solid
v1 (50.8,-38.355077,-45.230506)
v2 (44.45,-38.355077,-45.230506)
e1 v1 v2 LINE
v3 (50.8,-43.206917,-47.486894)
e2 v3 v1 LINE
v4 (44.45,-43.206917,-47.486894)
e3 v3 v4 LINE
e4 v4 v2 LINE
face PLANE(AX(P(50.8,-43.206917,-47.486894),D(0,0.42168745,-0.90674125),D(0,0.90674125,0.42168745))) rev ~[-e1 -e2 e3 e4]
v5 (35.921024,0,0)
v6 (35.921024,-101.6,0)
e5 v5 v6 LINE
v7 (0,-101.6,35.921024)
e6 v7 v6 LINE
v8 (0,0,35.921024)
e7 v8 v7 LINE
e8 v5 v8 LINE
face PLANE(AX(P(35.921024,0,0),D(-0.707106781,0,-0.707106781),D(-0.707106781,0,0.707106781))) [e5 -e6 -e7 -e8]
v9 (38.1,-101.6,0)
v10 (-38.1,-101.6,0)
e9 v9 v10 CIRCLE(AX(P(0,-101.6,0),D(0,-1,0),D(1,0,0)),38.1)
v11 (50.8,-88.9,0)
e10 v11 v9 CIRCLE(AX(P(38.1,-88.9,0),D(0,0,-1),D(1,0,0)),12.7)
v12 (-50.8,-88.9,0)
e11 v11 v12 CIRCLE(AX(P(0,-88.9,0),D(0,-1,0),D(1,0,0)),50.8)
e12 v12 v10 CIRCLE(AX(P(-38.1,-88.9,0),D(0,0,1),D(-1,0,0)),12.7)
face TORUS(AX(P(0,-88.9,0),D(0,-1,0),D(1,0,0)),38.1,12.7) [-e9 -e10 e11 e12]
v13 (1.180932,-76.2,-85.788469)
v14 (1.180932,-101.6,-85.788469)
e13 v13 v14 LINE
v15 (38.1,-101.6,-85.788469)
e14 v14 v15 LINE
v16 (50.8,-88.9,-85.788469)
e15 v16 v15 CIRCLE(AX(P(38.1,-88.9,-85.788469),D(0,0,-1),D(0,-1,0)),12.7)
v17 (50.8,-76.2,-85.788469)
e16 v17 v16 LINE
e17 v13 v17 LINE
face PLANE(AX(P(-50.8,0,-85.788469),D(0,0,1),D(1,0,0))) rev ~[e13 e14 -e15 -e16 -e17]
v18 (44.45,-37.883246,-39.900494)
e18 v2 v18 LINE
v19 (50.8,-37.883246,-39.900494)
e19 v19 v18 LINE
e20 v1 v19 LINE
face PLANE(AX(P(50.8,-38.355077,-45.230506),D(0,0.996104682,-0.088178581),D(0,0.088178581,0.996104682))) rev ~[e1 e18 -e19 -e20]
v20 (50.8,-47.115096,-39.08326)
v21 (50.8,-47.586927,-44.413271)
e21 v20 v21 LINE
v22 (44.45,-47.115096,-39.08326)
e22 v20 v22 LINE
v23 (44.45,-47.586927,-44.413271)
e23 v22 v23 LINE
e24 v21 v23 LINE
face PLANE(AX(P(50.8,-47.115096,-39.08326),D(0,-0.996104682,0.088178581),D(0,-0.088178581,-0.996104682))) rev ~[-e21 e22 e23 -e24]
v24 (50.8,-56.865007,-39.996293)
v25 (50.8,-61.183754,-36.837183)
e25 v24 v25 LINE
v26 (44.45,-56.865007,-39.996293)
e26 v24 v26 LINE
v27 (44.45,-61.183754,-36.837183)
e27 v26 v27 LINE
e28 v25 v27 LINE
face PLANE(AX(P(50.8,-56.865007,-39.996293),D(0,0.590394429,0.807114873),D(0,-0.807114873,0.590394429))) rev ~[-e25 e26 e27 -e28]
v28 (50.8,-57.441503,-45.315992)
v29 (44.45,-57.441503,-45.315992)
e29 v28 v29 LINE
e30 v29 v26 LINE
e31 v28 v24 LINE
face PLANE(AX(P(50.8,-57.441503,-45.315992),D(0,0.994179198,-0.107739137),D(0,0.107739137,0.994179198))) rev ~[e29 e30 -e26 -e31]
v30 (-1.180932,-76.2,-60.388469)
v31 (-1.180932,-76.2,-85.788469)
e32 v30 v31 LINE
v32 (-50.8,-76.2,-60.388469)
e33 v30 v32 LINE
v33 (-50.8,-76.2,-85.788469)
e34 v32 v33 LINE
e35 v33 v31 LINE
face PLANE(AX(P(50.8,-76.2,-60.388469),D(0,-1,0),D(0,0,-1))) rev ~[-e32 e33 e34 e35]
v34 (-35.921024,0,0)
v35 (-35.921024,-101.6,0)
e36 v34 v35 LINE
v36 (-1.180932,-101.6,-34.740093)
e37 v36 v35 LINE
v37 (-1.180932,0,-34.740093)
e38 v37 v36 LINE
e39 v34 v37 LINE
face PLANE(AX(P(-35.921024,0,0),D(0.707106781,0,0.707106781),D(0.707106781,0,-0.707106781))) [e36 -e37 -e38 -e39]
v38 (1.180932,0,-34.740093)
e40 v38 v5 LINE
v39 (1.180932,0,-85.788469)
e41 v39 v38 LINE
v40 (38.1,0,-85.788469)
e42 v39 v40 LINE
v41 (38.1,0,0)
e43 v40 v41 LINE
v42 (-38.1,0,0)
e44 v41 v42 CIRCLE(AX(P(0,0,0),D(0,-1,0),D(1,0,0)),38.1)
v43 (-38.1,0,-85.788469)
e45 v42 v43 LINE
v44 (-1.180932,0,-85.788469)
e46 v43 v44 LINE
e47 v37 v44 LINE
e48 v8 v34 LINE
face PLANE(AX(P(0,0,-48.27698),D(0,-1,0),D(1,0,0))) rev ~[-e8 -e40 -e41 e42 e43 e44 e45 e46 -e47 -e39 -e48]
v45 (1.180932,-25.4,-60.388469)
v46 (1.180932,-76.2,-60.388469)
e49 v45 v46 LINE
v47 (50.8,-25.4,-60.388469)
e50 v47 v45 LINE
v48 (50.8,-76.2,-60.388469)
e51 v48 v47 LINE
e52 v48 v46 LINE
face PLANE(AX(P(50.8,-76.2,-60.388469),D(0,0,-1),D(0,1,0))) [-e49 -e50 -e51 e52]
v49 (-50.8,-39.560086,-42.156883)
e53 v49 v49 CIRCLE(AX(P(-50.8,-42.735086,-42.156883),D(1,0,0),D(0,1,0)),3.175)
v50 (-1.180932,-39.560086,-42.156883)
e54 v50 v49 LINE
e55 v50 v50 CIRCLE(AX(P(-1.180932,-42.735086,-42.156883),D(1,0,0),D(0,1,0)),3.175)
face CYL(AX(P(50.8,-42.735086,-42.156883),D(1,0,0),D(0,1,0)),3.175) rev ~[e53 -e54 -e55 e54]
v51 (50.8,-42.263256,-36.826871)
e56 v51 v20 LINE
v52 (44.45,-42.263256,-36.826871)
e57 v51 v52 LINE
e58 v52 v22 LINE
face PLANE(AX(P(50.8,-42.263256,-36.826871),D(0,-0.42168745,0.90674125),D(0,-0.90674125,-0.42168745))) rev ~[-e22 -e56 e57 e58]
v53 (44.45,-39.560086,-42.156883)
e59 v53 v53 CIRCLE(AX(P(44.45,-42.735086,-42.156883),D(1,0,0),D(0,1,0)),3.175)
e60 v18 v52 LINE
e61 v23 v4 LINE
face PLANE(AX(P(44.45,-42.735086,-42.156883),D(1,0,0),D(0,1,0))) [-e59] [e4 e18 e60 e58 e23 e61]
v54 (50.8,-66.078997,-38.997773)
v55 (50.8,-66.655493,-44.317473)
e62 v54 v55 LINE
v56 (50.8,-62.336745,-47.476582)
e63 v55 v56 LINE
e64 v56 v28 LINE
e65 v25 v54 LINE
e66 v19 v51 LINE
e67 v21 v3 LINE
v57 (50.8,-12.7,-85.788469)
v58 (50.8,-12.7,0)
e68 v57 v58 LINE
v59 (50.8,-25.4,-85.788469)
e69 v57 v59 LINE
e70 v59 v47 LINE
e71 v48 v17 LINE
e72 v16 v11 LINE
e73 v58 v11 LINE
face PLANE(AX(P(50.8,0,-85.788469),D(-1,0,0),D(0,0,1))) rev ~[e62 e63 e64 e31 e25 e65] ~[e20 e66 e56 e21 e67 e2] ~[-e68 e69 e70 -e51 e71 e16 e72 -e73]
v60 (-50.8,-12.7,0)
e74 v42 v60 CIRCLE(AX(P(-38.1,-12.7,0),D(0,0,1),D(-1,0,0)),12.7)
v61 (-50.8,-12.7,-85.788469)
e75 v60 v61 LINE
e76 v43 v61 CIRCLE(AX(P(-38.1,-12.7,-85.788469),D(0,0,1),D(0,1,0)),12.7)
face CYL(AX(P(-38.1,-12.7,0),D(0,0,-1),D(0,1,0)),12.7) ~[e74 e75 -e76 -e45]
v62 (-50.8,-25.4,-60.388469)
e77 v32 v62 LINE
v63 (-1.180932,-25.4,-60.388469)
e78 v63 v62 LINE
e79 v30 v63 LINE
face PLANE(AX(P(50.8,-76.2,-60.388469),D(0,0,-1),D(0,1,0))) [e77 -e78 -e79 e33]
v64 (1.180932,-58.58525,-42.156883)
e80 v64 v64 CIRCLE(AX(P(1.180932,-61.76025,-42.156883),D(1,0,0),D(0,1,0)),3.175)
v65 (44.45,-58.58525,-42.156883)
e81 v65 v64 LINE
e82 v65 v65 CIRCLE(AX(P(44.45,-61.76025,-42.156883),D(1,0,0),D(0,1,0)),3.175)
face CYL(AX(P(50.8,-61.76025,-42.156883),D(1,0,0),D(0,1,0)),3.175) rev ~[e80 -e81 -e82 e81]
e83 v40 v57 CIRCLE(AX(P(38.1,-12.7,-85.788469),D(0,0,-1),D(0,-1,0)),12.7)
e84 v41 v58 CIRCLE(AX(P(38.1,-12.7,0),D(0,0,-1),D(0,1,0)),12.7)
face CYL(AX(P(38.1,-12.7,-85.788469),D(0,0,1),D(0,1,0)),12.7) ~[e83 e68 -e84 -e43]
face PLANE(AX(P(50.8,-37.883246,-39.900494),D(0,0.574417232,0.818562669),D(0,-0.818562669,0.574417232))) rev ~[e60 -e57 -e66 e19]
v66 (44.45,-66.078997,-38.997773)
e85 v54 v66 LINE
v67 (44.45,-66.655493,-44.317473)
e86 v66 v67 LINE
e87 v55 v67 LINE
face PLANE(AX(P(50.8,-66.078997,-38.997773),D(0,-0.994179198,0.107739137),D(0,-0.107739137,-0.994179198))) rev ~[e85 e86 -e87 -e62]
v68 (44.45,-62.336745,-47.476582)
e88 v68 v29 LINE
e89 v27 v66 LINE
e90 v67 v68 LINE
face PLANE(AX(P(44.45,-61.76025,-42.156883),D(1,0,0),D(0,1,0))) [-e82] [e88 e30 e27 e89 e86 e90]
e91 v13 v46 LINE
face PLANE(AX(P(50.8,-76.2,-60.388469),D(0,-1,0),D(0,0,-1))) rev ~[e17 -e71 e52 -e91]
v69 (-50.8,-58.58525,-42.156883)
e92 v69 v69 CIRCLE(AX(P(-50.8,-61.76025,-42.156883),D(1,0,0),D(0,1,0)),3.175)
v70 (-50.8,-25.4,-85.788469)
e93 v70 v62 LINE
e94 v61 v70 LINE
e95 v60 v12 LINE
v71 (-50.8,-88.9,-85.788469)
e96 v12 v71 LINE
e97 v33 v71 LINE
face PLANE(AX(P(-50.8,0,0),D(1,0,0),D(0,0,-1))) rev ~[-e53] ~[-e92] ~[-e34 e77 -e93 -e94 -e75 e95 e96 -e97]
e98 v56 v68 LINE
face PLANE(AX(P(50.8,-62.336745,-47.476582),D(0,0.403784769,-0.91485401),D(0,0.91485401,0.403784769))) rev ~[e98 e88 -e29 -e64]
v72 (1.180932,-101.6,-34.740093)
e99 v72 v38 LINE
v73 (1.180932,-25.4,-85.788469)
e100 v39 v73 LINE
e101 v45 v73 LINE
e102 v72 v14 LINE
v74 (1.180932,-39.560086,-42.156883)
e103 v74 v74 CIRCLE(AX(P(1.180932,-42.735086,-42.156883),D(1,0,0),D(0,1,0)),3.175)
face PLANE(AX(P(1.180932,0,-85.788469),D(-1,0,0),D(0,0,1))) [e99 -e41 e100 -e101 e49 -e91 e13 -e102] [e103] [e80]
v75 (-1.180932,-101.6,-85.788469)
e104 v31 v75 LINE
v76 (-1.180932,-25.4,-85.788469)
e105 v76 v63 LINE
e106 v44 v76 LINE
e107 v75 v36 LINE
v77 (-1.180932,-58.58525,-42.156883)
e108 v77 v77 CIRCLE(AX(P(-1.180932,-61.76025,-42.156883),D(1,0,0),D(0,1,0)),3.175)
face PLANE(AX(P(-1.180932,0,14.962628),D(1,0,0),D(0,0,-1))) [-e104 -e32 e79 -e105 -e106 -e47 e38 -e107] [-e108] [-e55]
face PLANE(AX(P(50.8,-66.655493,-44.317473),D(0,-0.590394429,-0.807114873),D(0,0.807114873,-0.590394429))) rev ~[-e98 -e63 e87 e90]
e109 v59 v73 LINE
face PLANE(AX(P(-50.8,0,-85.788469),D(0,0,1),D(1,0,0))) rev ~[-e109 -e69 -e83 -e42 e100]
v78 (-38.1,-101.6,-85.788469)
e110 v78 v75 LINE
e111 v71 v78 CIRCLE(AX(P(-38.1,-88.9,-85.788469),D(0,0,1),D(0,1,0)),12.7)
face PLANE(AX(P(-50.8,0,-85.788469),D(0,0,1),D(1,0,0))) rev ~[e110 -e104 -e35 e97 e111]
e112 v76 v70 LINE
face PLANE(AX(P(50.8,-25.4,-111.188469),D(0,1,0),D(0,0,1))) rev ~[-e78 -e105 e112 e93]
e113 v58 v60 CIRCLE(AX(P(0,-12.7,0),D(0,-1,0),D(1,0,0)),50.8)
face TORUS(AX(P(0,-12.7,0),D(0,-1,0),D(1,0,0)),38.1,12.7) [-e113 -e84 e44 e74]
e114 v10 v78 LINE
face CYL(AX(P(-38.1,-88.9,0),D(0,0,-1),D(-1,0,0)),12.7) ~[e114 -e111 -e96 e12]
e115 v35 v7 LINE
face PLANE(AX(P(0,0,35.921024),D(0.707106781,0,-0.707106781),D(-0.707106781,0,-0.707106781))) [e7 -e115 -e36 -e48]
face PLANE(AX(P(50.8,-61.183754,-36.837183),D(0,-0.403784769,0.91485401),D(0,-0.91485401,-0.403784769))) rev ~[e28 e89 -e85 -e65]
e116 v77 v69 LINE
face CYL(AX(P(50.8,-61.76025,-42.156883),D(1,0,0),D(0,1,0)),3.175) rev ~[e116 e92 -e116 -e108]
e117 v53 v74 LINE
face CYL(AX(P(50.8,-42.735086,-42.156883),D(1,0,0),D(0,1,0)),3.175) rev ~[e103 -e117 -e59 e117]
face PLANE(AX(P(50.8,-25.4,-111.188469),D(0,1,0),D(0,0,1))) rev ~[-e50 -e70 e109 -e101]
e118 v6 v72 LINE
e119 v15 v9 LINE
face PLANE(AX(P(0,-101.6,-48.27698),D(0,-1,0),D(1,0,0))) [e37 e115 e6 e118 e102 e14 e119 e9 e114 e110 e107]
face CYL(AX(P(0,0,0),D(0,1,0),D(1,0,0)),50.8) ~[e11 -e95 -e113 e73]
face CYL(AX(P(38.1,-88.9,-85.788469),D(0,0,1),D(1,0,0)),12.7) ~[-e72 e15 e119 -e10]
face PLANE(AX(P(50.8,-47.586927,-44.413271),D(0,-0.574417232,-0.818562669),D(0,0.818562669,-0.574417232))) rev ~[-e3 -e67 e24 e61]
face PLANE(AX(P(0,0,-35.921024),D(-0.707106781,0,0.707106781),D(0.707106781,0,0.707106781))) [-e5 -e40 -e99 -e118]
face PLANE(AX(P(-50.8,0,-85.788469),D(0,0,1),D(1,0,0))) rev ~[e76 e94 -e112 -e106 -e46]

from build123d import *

# Parameters (mm, degrees)
F3_DEPTH = 101.6
F4_DEPTH = 282.663077116
F5_R     = 3.175
F6_DEPTH = 127
F7_DEPTH = 6.35
F8_W     = 50.8
F8_H     = 50.8
F8_H_2   = 25.4
F9_DEPTH = 127
F10_R    = 12.7


with BuildPart() as f3:
    # F0 (on Front) → F3 (new body)
    with BuildSketch(Plane.XZ):
        with BuildLine():
            Line((50.8, -85.7884685198), (50.8, 0))
            ThreePointArc((50.8, 0), (0, -50.8), (-50.8, 0))
            Line((-50.8, 0), (-50.8, -85.7884685198))
            Line((-50.8, -85.7884685198), (50.8, -85.7884685198))
        make_face()
        with BuildLine():
            ThreePointArc((-50.8, 0), (0, -50.8), (50.8, 0))
            ThreePointArc((50.8, 0), (0, 50.8), (-50.8, 0))
        make_face()
    extrude(amount=F3_DEPTH)

    # F2 (on face) + F1 (on Front) → F4 (cut)
    with BuildSketch(Plane.XZ):
        with BuildLine():
            Line((-1.1809319258, -85.7884685198), (1.1809319258, -85.7884685198))
            Line((1.1809319258, -85.7884685198), (1.1809319258, -50.786271765))
            ThreePointArc((1.1809319258, -50.786271765), (0, -50.8), (-1.1809319258, -50.786271765))
            Line((-1.1809319258, -50.786271765), (-1.1809319258, -85.7884685198))
        make_face()
        with BuildLine():
            ThreePointArc((-1.1809319258, -50.786271765), (0, -50.8), (1.1809319258, -50.786271765))
            Line((1.1809319258, -50.786271765), (1.1809319258, 14.9626284838))
            Line((1.1809319258, 14.9626284838), (-1.1809319258, 14.9626284838))
            Line((-1.1809319258, 14.9626284838), (-1.1809319258, -50.786271765))
        make_face()
    with BuildSketch(Plane.XZ):
        Polygon((35.9210244843, 0), (0, 35.9210244843), (-35.9210244843, 0), (0, -35.9210244843), align=None)
    extrude(amount=F4_DEPTH, mode=Mode.SUBTRACT)

    # F5 (on face) → F6 (cut)
    with BuildSketch(Plane.YZ.offset(50.8)):
        with Locations((-42.7350864422, -42.1568825841)):
            Circle(F5_R)
        with Locations((-61.7602499746, -42.1568825841)):
            Circle(F5_R)
    extrude(amount=-F6_DEPTH, mode=Mode.SUBTRACT)

    # F5 (on face) → F7 (cut)
    with BuildSketch(Plane.YZ.offset(50.8)):
        Polygon((-62.336745475, -47.4765820931), (-57.4415028095, -45.3159920871), (-56.8650073091, -39.9962925781), (-61.1837544742, -36.8371830751), (-66.0789971397, -38.9977730811), (-66.6554926401, -44.3174725901), align=None)
        with Locations((-61.7602499746, -42.1568825841)):
            Circle(F5_R, mode=Mode.SUBTRACT)
        Polygon((-43.2069172048, -47.486893887), (-38.3550766327, -45.2305056623), (-37.88324587, -39.9004943594), (-42.2632556795, -36.8268712812), (-47.1150962516, -39.0832595059), (-47.5869270143, -44.4132708088), align=None)
        with Locations((-42.7350864422, -42.1568825841)):
            Circle(F5_R, mode=Mode.SUBTRACT)
    extrude(amount=-F7_DEPTH, mode=Mode.SUBTRACT)

    # F8 (on face) → F9 (cut)
    with BuildSketch(Plane.YZ.offset(50.8)):
        with Locations((-50.8, -85.7884685198)):
            Rectangle(F8_W, F8_H)
        with Locations((-50.8, -73.0884685198)):
            Rectangle(F8_W, F8_H_2)
    extrude(amount=-F9_DEPTH, mode=Mode.SUBTRACT)

    # F10
    f10_edges = [f3.edges().sort_by_distance(p)[0] for p in [
        (0, -101.6, 50.8),
        (50.8, -101.6, -42.894234),
        (0, 0, 50.8),
        (50.8, 0, -42.894234),
        (-50.8, 0, -42.894234),
        (-50.8, -101.6, -42.894234),
    ]]
    fillet(f10_edges, radius=F10_R)


solid = f3.part
